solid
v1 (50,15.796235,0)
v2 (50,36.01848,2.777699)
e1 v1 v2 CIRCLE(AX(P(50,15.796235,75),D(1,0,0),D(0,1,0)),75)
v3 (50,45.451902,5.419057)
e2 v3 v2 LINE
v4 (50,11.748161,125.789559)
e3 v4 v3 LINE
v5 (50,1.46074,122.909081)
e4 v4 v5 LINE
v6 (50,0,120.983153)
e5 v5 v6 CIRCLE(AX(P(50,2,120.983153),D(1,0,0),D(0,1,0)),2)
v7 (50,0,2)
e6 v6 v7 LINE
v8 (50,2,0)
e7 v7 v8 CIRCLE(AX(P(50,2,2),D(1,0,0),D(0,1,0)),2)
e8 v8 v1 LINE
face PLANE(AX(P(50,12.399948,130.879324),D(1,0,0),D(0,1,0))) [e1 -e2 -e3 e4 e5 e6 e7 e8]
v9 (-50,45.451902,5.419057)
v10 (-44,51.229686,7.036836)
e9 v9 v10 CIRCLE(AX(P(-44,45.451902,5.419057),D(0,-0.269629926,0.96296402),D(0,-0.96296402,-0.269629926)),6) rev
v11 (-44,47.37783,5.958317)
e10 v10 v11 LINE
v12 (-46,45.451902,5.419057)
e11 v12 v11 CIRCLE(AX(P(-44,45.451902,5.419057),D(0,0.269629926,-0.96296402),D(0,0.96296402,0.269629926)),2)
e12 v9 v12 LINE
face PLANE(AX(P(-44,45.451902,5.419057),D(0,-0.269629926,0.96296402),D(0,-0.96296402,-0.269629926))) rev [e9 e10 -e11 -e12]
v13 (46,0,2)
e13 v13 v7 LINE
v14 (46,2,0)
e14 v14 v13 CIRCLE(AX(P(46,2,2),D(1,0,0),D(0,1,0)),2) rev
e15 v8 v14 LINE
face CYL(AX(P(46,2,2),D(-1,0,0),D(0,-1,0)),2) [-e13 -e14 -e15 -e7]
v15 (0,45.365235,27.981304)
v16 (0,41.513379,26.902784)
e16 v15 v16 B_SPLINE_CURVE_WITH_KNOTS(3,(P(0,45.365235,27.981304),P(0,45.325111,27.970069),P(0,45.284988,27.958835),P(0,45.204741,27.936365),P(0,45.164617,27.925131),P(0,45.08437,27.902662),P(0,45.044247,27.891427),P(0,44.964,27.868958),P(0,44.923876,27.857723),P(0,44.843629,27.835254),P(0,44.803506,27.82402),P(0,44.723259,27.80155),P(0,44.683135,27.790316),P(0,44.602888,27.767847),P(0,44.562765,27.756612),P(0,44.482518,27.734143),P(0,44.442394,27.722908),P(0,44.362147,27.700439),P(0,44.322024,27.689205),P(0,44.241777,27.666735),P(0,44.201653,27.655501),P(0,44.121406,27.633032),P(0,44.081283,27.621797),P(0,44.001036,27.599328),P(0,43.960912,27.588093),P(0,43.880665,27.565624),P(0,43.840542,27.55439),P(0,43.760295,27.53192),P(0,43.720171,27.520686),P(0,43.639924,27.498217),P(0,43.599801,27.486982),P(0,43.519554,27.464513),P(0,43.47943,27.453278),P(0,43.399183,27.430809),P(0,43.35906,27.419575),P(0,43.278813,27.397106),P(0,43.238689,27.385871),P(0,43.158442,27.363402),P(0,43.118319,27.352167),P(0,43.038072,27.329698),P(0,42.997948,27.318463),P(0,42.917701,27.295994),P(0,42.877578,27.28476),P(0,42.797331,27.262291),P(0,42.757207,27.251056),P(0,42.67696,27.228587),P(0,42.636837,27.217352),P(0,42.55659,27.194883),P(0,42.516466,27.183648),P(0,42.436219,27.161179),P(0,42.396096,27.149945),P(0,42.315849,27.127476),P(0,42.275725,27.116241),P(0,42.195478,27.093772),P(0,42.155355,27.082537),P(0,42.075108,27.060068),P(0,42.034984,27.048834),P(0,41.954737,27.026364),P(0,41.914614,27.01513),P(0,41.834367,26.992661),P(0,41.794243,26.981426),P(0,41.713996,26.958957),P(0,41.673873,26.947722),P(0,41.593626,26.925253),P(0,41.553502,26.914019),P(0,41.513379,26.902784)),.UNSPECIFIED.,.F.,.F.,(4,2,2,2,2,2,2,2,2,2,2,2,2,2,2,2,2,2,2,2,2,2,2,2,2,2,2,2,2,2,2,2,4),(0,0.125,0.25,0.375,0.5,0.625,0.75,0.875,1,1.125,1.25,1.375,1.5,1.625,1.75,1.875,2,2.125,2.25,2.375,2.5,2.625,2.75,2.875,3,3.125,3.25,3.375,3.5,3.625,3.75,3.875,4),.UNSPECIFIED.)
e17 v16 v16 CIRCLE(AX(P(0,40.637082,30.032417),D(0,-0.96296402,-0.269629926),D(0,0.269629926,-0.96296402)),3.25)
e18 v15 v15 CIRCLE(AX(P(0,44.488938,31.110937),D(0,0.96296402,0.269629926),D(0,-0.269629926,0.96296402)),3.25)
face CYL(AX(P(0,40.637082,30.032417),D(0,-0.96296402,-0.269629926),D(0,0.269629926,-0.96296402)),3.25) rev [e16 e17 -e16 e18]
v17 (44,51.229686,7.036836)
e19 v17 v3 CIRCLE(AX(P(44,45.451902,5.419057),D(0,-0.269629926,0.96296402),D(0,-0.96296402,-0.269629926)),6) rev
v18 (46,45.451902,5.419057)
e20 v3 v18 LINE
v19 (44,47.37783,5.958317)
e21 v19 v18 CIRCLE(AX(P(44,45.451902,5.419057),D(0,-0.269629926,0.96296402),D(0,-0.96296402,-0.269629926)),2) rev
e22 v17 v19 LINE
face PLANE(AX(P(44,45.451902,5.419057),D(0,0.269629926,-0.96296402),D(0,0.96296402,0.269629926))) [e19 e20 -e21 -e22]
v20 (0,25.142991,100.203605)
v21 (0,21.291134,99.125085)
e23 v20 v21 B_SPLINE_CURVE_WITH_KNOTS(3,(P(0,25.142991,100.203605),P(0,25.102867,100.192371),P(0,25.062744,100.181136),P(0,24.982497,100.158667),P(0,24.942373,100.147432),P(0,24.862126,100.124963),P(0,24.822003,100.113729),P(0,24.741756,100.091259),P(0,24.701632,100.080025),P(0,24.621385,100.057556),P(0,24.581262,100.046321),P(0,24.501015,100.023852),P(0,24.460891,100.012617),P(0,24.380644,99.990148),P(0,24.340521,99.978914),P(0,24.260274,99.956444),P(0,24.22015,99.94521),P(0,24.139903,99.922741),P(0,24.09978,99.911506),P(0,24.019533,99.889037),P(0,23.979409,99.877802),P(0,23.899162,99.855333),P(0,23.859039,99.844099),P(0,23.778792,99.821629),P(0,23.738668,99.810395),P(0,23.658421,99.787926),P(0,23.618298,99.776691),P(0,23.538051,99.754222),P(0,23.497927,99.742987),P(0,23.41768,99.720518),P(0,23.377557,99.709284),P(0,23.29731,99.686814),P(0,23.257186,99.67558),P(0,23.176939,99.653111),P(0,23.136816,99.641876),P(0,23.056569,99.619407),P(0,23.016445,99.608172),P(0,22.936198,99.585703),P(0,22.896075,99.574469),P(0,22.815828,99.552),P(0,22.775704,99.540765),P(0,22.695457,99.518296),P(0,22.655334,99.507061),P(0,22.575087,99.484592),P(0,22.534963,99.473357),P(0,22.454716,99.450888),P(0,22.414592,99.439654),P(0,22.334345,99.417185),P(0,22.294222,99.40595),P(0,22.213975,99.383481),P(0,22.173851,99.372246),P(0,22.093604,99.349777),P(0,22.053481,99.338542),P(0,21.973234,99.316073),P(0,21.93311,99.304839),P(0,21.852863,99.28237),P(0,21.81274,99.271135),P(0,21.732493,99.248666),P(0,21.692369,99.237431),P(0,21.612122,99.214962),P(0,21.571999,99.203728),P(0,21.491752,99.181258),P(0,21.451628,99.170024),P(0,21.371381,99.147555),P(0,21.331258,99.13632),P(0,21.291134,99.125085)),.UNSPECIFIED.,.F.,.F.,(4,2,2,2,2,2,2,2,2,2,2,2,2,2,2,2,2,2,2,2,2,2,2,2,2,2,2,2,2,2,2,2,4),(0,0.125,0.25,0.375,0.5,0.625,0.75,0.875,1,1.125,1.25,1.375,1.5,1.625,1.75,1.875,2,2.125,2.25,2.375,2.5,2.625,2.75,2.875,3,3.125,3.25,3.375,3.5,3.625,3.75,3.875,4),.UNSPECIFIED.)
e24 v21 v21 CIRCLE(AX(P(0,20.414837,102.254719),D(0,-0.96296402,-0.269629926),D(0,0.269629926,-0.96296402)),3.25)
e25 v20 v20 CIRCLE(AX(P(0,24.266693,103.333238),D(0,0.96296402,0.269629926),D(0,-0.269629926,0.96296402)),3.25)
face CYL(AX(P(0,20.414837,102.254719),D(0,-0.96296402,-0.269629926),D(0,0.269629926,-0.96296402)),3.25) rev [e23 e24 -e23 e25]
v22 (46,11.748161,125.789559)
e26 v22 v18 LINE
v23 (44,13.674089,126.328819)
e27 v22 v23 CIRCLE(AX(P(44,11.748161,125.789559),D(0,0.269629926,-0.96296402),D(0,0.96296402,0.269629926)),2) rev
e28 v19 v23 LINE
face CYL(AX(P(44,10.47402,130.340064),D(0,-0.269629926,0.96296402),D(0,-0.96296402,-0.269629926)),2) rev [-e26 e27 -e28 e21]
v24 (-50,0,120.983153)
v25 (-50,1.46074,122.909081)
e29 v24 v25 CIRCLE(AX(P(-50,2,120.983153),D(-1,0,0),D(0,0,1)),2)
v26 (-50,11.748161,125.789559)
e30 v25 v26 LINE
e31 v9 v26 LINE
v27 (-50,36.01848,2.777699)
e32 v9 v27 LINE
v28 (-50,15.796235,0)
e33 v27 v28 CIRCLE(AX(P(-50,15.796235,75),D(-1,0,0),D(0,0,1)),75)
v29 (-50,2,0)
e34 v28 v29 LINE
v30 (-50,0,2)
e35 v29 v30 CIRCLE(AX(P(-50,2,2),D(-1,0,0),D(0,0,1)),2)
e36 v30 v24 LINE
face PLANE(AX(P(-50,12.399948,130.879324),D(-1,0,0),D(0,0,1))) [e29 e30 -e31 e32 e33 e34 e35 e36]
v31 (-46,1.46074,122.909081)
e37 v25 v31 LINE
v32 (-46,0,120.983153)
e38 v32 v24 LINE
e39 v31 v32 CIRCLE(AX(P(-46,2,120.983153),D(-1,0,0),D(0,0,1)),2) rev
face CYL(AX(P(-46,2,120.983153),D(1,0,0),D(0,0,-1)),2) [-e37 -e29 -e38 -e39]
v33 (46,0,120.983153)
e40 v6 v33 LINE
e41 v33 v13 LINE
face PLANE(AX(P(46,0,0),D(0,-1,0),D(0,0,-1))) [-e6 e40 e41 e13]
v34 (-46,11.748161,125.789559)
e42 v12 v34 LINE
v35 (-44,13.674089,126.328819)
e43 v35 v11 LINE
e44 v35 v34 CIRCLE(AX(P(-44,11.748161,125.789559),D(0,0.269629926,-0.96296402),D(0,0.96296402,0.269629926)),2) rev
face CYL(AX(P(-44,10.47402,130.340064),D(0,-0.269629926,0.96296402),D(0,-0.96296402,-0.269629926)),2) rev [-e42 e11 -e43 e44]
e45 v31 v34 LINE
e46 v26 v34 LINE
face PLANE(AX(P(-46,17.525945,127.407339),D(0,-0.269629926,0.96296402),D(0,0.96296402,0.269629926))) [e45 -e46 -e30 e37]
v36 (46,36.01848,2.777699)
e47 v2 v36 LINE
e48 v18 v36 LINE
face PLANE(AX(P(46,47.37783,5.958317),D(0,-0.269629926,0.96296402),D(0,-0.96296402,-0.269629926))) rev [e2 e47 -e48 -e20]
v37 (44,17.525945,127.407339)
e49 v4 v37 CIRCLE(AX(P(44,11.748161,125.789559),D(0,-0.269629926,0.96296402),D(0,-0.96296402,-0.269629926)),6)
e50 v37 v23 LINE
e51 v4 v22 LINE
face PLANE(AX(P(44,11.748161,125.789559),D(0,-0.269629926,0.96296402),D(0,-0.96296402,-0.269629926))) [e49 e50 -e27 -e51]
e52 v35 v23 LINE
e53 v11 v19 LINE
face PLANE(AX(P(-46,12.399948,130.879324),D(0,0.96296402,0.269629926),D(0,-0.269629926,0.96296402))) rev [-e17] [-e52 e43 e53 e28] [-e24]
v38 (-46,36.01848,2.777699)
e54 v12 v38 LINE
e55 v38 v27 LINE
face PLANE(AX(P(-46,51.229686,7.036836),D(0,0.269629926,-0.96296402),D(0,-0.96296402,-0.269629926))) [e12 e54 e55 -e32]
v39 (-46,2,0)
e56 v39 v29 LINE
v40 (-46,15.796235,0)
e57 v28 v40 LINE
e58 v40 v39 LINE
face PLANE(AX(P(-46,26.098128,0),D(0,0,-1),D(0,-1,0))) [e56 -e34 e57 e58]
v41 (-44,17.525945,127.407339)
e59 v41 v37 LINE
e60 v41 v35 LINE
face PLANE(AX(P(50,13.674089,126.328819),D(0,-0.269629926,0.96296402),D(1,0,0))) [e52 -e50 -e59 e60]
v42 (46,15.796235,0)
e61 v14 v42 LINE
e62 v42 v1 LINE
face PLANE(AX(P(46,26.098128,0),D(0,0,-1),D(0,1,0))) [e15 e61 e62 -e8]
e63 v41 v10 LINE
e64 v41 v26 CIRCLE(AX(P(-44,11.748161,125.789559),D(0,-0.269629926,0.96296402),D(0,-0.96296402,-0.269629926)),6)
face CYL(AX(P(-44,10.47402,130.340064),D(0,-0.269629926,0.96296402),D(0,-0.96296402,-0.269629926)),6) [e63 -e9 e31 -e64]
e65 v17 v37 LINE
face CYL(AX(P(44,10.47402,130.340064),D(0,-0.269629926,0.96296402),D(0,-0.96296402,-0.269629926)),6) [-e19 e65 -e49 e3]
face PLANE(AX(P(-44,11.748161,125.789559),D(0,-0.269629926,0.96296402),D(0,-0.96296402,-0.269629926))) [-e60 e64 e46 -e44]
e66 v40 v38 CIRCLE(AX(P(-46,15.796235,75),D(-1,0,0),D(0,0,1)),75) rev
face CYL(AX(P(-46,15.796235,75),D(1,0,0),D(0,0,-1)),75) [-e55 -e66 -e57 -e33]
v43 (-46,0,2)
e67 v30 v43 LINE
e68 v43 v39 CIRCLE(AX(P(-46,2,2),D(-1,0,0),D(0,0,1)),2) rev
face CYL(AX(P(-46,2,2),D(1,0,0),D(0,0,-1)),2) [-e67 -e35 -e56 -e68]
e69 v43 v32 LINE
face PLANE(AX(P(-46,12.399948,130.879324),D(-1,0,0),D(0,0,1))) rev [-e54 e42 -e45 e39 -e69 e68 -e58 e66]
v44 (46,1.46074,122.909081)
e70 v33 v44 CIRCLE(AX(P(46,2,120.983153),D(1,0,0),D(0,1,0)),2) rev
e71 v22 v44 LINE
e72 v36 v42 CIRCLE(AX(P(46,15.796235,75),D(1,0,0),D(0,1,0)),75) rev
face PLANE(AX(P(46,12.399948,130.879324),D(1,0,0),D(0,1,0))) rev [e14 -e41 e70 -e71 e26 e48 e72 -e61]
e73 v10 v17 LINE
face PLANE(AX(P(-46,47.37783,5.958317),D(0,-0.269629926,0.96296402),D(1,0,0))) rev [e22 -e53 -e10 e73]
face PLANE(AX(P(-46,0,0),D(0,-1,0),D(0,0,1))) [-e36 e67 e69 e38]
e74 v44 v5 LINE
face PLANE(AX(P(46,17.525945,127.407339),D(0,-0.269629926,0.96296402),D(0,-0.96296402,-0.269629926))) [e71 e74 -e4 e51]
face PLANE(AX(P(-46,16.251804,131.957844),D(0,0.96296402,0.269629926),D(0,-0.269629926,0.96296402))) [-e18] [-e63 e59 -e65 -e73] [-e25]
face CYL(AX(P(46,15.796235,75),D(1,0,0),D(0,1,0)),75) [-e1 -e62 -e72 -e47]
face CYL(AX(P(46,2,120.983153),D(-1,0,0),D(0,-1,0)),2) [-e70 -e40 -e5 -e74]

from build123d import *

# Parameters (mm, degrees)
BOSS_EXTRUDE1_DEPTH        = 50
SKETCH2_W                  = 92
SKETCH2_H                  = 47.229685849
CUT_EXTRUDE4_DEPTH         = 152.455959439
CONVERT_SOLID1_START       = -117.963163746
CONVERT_SOLID1_DEPTH       = 125
CONVERT_SOLID1_2_DEPTH     = 125
FILLET1_R                  = 2
FILLET2_R                  = 75
F_6_5_6_5_DIAMETER_HOLE1_D = 6.5
F_6_5_6_5_DIAMETER_HOLE2_D = 6.5


# Read off the part's stored shape, not the designer's step: Convert-Solid1
with BuildPart() as part:
    # Sketch1 → Boss-Extrude1 (new, symmetric)
    with BuildSketch(Plane(origin=(0, 0, 0), x_dir=(0, 0, -1), z_dir=(1, 0, 0))):
        Polygon((-127.407338719, 17.525945159), (-7.036836254, 51.229685849), (0, 26.098127798), (0, 0), (-122.500074074, 0), align=None)
    extrude(amount=BOSS_EXTRUDE1_DEPTH, both=True)

    # Sketch2 → Cut-Extrude4 (cut, through all)
    with BuildSketch(Plane(origin=(0, 1.897341635, -6.776220126), x_dir=(-1, 0, 0), z_dir=(0, 0.2696299255199709, -0.9629640197141818))):
        with Locations((0, 23.614842925)):
            Rectangle(SKETCH2_W, SKETCH2_H)
    extrude(amount=-CUT_EXTRUDE4_DEPTH, mode=Mode.SUBTRACT)

    # Convert-Solid1 outline → Convert-Solid1 (cut)
    with BuildSketch(Plane(origin=(0, 0, 0), x_dir=(1, 0, 0), z_dir=(0, 0.26962992551997095, -0.9629640197141818)).offset(CONVERT_SOLID1_START)):
        with BuildLine():
            Line((50, -51.229685849), (50, -45.229685849))
            ThreePointArc((50, -45.229685849), (48.242640687, -49.472326536), (44, -51.229685849))
            Line((44, -51.229685849), (50, -51.229685849))
        make_face()
        with BuildLine():
            Line((-50, -51.229685849), (-44, -51.229685849))
            ThreePointArc((-44, -51.229685849), (-48.242640687, -49.472326536), (-50, -45.229685849))
            Line((-50, -45.229685849), (-50, -51.229685849))
        make_face()
    extrude(amount=CONVERT_SOLID1_DEPTH, mode=Mode.SUBTRACT)

    # Convert-Solid1 2 outline → Convert-Solid1 2 (add)
    with BuildSketch(Plane(origin=(0, 0, 0), x_dir=(1, 0, 0), z_dir=(0, 0.26962992551997095, -0.9629640197141818)).offset(CONVERT_SOLID1_START)):
        with BuildLine():
            Line((46, -47.229685849), (46, -45.229685849))
            ThreePointArc((46, -45.229685849), (45.414213562, -46.643899411), (44, -47.229685849))
            Line((44, -47.229685849), (46, -47.229685849))
        make_face()
        with BuildLine():
            Line((-46, -47.229685849), (-44, -47.229685849))
            ThreePointArc((-44, -47.229685849), (-45.414213562, -46.643899411), (-46, -45.229685849))
            Line((-46, -45.229685849), (-46, -47.229685849))
        make_face()
    extrude(amount=CONVERT_SOLID1_2_DEPTH)

    # Fillet1
    fillet1_edges = [part.edges().sort_by_distance(p)[0] for p in [
        (48, 0, 122.500074074),
        (48, 0, 0),
        (-48, 0, 0),
        (-48, 0, 122.500074074),
    ]]
    fillet(fillet1_edges, radius=FILLET1_R)

    # Fillet2
    fillet2_edges = [part.edges().sort_by_distance(p)[0] for p in [
        (48, 26.098127798, 0),
        (-48, 26.098127798, 0),
    ]]
    fillet(fillet2_edges, radius=FILLET2_R)

    # Ø6.5 (6.5) Diameter Hole1 (through all)
    with Locations(Plane(origin=(92.5, 101.400740105, -186.980648929), x_dir=(-1, 0, 0), z_dir=(0, -0.9629640197141818, -0.2696299255199709))):
        with Locations((92.5, -300.359475049), (92.5, -225.359475049), (-92.5, -300.359475049), (-92.5, -225.359475049)):
            Hole(F_6_5_6_5_DIAMETER_HOLE1_D / 2)

    # Ø6.5 (6.5) Diameter Hole2 (through all)
    with Locations(Plane(origin=(-92.5, 101.400740105, -186.980648929), x_dir=(-1, 0, 0), z_dir=(0, -0.9629640197141818, -0.2696299255199709))):
        with Locations((92.5, -300.359475049), (92.5, -225.359475049), (-92.5, -300.359475049), (-92.5, -225.359475049)):
            Hole(F_6_5_6_5_DIAMETER_HOLE2_D / 2)


solid = part.part
